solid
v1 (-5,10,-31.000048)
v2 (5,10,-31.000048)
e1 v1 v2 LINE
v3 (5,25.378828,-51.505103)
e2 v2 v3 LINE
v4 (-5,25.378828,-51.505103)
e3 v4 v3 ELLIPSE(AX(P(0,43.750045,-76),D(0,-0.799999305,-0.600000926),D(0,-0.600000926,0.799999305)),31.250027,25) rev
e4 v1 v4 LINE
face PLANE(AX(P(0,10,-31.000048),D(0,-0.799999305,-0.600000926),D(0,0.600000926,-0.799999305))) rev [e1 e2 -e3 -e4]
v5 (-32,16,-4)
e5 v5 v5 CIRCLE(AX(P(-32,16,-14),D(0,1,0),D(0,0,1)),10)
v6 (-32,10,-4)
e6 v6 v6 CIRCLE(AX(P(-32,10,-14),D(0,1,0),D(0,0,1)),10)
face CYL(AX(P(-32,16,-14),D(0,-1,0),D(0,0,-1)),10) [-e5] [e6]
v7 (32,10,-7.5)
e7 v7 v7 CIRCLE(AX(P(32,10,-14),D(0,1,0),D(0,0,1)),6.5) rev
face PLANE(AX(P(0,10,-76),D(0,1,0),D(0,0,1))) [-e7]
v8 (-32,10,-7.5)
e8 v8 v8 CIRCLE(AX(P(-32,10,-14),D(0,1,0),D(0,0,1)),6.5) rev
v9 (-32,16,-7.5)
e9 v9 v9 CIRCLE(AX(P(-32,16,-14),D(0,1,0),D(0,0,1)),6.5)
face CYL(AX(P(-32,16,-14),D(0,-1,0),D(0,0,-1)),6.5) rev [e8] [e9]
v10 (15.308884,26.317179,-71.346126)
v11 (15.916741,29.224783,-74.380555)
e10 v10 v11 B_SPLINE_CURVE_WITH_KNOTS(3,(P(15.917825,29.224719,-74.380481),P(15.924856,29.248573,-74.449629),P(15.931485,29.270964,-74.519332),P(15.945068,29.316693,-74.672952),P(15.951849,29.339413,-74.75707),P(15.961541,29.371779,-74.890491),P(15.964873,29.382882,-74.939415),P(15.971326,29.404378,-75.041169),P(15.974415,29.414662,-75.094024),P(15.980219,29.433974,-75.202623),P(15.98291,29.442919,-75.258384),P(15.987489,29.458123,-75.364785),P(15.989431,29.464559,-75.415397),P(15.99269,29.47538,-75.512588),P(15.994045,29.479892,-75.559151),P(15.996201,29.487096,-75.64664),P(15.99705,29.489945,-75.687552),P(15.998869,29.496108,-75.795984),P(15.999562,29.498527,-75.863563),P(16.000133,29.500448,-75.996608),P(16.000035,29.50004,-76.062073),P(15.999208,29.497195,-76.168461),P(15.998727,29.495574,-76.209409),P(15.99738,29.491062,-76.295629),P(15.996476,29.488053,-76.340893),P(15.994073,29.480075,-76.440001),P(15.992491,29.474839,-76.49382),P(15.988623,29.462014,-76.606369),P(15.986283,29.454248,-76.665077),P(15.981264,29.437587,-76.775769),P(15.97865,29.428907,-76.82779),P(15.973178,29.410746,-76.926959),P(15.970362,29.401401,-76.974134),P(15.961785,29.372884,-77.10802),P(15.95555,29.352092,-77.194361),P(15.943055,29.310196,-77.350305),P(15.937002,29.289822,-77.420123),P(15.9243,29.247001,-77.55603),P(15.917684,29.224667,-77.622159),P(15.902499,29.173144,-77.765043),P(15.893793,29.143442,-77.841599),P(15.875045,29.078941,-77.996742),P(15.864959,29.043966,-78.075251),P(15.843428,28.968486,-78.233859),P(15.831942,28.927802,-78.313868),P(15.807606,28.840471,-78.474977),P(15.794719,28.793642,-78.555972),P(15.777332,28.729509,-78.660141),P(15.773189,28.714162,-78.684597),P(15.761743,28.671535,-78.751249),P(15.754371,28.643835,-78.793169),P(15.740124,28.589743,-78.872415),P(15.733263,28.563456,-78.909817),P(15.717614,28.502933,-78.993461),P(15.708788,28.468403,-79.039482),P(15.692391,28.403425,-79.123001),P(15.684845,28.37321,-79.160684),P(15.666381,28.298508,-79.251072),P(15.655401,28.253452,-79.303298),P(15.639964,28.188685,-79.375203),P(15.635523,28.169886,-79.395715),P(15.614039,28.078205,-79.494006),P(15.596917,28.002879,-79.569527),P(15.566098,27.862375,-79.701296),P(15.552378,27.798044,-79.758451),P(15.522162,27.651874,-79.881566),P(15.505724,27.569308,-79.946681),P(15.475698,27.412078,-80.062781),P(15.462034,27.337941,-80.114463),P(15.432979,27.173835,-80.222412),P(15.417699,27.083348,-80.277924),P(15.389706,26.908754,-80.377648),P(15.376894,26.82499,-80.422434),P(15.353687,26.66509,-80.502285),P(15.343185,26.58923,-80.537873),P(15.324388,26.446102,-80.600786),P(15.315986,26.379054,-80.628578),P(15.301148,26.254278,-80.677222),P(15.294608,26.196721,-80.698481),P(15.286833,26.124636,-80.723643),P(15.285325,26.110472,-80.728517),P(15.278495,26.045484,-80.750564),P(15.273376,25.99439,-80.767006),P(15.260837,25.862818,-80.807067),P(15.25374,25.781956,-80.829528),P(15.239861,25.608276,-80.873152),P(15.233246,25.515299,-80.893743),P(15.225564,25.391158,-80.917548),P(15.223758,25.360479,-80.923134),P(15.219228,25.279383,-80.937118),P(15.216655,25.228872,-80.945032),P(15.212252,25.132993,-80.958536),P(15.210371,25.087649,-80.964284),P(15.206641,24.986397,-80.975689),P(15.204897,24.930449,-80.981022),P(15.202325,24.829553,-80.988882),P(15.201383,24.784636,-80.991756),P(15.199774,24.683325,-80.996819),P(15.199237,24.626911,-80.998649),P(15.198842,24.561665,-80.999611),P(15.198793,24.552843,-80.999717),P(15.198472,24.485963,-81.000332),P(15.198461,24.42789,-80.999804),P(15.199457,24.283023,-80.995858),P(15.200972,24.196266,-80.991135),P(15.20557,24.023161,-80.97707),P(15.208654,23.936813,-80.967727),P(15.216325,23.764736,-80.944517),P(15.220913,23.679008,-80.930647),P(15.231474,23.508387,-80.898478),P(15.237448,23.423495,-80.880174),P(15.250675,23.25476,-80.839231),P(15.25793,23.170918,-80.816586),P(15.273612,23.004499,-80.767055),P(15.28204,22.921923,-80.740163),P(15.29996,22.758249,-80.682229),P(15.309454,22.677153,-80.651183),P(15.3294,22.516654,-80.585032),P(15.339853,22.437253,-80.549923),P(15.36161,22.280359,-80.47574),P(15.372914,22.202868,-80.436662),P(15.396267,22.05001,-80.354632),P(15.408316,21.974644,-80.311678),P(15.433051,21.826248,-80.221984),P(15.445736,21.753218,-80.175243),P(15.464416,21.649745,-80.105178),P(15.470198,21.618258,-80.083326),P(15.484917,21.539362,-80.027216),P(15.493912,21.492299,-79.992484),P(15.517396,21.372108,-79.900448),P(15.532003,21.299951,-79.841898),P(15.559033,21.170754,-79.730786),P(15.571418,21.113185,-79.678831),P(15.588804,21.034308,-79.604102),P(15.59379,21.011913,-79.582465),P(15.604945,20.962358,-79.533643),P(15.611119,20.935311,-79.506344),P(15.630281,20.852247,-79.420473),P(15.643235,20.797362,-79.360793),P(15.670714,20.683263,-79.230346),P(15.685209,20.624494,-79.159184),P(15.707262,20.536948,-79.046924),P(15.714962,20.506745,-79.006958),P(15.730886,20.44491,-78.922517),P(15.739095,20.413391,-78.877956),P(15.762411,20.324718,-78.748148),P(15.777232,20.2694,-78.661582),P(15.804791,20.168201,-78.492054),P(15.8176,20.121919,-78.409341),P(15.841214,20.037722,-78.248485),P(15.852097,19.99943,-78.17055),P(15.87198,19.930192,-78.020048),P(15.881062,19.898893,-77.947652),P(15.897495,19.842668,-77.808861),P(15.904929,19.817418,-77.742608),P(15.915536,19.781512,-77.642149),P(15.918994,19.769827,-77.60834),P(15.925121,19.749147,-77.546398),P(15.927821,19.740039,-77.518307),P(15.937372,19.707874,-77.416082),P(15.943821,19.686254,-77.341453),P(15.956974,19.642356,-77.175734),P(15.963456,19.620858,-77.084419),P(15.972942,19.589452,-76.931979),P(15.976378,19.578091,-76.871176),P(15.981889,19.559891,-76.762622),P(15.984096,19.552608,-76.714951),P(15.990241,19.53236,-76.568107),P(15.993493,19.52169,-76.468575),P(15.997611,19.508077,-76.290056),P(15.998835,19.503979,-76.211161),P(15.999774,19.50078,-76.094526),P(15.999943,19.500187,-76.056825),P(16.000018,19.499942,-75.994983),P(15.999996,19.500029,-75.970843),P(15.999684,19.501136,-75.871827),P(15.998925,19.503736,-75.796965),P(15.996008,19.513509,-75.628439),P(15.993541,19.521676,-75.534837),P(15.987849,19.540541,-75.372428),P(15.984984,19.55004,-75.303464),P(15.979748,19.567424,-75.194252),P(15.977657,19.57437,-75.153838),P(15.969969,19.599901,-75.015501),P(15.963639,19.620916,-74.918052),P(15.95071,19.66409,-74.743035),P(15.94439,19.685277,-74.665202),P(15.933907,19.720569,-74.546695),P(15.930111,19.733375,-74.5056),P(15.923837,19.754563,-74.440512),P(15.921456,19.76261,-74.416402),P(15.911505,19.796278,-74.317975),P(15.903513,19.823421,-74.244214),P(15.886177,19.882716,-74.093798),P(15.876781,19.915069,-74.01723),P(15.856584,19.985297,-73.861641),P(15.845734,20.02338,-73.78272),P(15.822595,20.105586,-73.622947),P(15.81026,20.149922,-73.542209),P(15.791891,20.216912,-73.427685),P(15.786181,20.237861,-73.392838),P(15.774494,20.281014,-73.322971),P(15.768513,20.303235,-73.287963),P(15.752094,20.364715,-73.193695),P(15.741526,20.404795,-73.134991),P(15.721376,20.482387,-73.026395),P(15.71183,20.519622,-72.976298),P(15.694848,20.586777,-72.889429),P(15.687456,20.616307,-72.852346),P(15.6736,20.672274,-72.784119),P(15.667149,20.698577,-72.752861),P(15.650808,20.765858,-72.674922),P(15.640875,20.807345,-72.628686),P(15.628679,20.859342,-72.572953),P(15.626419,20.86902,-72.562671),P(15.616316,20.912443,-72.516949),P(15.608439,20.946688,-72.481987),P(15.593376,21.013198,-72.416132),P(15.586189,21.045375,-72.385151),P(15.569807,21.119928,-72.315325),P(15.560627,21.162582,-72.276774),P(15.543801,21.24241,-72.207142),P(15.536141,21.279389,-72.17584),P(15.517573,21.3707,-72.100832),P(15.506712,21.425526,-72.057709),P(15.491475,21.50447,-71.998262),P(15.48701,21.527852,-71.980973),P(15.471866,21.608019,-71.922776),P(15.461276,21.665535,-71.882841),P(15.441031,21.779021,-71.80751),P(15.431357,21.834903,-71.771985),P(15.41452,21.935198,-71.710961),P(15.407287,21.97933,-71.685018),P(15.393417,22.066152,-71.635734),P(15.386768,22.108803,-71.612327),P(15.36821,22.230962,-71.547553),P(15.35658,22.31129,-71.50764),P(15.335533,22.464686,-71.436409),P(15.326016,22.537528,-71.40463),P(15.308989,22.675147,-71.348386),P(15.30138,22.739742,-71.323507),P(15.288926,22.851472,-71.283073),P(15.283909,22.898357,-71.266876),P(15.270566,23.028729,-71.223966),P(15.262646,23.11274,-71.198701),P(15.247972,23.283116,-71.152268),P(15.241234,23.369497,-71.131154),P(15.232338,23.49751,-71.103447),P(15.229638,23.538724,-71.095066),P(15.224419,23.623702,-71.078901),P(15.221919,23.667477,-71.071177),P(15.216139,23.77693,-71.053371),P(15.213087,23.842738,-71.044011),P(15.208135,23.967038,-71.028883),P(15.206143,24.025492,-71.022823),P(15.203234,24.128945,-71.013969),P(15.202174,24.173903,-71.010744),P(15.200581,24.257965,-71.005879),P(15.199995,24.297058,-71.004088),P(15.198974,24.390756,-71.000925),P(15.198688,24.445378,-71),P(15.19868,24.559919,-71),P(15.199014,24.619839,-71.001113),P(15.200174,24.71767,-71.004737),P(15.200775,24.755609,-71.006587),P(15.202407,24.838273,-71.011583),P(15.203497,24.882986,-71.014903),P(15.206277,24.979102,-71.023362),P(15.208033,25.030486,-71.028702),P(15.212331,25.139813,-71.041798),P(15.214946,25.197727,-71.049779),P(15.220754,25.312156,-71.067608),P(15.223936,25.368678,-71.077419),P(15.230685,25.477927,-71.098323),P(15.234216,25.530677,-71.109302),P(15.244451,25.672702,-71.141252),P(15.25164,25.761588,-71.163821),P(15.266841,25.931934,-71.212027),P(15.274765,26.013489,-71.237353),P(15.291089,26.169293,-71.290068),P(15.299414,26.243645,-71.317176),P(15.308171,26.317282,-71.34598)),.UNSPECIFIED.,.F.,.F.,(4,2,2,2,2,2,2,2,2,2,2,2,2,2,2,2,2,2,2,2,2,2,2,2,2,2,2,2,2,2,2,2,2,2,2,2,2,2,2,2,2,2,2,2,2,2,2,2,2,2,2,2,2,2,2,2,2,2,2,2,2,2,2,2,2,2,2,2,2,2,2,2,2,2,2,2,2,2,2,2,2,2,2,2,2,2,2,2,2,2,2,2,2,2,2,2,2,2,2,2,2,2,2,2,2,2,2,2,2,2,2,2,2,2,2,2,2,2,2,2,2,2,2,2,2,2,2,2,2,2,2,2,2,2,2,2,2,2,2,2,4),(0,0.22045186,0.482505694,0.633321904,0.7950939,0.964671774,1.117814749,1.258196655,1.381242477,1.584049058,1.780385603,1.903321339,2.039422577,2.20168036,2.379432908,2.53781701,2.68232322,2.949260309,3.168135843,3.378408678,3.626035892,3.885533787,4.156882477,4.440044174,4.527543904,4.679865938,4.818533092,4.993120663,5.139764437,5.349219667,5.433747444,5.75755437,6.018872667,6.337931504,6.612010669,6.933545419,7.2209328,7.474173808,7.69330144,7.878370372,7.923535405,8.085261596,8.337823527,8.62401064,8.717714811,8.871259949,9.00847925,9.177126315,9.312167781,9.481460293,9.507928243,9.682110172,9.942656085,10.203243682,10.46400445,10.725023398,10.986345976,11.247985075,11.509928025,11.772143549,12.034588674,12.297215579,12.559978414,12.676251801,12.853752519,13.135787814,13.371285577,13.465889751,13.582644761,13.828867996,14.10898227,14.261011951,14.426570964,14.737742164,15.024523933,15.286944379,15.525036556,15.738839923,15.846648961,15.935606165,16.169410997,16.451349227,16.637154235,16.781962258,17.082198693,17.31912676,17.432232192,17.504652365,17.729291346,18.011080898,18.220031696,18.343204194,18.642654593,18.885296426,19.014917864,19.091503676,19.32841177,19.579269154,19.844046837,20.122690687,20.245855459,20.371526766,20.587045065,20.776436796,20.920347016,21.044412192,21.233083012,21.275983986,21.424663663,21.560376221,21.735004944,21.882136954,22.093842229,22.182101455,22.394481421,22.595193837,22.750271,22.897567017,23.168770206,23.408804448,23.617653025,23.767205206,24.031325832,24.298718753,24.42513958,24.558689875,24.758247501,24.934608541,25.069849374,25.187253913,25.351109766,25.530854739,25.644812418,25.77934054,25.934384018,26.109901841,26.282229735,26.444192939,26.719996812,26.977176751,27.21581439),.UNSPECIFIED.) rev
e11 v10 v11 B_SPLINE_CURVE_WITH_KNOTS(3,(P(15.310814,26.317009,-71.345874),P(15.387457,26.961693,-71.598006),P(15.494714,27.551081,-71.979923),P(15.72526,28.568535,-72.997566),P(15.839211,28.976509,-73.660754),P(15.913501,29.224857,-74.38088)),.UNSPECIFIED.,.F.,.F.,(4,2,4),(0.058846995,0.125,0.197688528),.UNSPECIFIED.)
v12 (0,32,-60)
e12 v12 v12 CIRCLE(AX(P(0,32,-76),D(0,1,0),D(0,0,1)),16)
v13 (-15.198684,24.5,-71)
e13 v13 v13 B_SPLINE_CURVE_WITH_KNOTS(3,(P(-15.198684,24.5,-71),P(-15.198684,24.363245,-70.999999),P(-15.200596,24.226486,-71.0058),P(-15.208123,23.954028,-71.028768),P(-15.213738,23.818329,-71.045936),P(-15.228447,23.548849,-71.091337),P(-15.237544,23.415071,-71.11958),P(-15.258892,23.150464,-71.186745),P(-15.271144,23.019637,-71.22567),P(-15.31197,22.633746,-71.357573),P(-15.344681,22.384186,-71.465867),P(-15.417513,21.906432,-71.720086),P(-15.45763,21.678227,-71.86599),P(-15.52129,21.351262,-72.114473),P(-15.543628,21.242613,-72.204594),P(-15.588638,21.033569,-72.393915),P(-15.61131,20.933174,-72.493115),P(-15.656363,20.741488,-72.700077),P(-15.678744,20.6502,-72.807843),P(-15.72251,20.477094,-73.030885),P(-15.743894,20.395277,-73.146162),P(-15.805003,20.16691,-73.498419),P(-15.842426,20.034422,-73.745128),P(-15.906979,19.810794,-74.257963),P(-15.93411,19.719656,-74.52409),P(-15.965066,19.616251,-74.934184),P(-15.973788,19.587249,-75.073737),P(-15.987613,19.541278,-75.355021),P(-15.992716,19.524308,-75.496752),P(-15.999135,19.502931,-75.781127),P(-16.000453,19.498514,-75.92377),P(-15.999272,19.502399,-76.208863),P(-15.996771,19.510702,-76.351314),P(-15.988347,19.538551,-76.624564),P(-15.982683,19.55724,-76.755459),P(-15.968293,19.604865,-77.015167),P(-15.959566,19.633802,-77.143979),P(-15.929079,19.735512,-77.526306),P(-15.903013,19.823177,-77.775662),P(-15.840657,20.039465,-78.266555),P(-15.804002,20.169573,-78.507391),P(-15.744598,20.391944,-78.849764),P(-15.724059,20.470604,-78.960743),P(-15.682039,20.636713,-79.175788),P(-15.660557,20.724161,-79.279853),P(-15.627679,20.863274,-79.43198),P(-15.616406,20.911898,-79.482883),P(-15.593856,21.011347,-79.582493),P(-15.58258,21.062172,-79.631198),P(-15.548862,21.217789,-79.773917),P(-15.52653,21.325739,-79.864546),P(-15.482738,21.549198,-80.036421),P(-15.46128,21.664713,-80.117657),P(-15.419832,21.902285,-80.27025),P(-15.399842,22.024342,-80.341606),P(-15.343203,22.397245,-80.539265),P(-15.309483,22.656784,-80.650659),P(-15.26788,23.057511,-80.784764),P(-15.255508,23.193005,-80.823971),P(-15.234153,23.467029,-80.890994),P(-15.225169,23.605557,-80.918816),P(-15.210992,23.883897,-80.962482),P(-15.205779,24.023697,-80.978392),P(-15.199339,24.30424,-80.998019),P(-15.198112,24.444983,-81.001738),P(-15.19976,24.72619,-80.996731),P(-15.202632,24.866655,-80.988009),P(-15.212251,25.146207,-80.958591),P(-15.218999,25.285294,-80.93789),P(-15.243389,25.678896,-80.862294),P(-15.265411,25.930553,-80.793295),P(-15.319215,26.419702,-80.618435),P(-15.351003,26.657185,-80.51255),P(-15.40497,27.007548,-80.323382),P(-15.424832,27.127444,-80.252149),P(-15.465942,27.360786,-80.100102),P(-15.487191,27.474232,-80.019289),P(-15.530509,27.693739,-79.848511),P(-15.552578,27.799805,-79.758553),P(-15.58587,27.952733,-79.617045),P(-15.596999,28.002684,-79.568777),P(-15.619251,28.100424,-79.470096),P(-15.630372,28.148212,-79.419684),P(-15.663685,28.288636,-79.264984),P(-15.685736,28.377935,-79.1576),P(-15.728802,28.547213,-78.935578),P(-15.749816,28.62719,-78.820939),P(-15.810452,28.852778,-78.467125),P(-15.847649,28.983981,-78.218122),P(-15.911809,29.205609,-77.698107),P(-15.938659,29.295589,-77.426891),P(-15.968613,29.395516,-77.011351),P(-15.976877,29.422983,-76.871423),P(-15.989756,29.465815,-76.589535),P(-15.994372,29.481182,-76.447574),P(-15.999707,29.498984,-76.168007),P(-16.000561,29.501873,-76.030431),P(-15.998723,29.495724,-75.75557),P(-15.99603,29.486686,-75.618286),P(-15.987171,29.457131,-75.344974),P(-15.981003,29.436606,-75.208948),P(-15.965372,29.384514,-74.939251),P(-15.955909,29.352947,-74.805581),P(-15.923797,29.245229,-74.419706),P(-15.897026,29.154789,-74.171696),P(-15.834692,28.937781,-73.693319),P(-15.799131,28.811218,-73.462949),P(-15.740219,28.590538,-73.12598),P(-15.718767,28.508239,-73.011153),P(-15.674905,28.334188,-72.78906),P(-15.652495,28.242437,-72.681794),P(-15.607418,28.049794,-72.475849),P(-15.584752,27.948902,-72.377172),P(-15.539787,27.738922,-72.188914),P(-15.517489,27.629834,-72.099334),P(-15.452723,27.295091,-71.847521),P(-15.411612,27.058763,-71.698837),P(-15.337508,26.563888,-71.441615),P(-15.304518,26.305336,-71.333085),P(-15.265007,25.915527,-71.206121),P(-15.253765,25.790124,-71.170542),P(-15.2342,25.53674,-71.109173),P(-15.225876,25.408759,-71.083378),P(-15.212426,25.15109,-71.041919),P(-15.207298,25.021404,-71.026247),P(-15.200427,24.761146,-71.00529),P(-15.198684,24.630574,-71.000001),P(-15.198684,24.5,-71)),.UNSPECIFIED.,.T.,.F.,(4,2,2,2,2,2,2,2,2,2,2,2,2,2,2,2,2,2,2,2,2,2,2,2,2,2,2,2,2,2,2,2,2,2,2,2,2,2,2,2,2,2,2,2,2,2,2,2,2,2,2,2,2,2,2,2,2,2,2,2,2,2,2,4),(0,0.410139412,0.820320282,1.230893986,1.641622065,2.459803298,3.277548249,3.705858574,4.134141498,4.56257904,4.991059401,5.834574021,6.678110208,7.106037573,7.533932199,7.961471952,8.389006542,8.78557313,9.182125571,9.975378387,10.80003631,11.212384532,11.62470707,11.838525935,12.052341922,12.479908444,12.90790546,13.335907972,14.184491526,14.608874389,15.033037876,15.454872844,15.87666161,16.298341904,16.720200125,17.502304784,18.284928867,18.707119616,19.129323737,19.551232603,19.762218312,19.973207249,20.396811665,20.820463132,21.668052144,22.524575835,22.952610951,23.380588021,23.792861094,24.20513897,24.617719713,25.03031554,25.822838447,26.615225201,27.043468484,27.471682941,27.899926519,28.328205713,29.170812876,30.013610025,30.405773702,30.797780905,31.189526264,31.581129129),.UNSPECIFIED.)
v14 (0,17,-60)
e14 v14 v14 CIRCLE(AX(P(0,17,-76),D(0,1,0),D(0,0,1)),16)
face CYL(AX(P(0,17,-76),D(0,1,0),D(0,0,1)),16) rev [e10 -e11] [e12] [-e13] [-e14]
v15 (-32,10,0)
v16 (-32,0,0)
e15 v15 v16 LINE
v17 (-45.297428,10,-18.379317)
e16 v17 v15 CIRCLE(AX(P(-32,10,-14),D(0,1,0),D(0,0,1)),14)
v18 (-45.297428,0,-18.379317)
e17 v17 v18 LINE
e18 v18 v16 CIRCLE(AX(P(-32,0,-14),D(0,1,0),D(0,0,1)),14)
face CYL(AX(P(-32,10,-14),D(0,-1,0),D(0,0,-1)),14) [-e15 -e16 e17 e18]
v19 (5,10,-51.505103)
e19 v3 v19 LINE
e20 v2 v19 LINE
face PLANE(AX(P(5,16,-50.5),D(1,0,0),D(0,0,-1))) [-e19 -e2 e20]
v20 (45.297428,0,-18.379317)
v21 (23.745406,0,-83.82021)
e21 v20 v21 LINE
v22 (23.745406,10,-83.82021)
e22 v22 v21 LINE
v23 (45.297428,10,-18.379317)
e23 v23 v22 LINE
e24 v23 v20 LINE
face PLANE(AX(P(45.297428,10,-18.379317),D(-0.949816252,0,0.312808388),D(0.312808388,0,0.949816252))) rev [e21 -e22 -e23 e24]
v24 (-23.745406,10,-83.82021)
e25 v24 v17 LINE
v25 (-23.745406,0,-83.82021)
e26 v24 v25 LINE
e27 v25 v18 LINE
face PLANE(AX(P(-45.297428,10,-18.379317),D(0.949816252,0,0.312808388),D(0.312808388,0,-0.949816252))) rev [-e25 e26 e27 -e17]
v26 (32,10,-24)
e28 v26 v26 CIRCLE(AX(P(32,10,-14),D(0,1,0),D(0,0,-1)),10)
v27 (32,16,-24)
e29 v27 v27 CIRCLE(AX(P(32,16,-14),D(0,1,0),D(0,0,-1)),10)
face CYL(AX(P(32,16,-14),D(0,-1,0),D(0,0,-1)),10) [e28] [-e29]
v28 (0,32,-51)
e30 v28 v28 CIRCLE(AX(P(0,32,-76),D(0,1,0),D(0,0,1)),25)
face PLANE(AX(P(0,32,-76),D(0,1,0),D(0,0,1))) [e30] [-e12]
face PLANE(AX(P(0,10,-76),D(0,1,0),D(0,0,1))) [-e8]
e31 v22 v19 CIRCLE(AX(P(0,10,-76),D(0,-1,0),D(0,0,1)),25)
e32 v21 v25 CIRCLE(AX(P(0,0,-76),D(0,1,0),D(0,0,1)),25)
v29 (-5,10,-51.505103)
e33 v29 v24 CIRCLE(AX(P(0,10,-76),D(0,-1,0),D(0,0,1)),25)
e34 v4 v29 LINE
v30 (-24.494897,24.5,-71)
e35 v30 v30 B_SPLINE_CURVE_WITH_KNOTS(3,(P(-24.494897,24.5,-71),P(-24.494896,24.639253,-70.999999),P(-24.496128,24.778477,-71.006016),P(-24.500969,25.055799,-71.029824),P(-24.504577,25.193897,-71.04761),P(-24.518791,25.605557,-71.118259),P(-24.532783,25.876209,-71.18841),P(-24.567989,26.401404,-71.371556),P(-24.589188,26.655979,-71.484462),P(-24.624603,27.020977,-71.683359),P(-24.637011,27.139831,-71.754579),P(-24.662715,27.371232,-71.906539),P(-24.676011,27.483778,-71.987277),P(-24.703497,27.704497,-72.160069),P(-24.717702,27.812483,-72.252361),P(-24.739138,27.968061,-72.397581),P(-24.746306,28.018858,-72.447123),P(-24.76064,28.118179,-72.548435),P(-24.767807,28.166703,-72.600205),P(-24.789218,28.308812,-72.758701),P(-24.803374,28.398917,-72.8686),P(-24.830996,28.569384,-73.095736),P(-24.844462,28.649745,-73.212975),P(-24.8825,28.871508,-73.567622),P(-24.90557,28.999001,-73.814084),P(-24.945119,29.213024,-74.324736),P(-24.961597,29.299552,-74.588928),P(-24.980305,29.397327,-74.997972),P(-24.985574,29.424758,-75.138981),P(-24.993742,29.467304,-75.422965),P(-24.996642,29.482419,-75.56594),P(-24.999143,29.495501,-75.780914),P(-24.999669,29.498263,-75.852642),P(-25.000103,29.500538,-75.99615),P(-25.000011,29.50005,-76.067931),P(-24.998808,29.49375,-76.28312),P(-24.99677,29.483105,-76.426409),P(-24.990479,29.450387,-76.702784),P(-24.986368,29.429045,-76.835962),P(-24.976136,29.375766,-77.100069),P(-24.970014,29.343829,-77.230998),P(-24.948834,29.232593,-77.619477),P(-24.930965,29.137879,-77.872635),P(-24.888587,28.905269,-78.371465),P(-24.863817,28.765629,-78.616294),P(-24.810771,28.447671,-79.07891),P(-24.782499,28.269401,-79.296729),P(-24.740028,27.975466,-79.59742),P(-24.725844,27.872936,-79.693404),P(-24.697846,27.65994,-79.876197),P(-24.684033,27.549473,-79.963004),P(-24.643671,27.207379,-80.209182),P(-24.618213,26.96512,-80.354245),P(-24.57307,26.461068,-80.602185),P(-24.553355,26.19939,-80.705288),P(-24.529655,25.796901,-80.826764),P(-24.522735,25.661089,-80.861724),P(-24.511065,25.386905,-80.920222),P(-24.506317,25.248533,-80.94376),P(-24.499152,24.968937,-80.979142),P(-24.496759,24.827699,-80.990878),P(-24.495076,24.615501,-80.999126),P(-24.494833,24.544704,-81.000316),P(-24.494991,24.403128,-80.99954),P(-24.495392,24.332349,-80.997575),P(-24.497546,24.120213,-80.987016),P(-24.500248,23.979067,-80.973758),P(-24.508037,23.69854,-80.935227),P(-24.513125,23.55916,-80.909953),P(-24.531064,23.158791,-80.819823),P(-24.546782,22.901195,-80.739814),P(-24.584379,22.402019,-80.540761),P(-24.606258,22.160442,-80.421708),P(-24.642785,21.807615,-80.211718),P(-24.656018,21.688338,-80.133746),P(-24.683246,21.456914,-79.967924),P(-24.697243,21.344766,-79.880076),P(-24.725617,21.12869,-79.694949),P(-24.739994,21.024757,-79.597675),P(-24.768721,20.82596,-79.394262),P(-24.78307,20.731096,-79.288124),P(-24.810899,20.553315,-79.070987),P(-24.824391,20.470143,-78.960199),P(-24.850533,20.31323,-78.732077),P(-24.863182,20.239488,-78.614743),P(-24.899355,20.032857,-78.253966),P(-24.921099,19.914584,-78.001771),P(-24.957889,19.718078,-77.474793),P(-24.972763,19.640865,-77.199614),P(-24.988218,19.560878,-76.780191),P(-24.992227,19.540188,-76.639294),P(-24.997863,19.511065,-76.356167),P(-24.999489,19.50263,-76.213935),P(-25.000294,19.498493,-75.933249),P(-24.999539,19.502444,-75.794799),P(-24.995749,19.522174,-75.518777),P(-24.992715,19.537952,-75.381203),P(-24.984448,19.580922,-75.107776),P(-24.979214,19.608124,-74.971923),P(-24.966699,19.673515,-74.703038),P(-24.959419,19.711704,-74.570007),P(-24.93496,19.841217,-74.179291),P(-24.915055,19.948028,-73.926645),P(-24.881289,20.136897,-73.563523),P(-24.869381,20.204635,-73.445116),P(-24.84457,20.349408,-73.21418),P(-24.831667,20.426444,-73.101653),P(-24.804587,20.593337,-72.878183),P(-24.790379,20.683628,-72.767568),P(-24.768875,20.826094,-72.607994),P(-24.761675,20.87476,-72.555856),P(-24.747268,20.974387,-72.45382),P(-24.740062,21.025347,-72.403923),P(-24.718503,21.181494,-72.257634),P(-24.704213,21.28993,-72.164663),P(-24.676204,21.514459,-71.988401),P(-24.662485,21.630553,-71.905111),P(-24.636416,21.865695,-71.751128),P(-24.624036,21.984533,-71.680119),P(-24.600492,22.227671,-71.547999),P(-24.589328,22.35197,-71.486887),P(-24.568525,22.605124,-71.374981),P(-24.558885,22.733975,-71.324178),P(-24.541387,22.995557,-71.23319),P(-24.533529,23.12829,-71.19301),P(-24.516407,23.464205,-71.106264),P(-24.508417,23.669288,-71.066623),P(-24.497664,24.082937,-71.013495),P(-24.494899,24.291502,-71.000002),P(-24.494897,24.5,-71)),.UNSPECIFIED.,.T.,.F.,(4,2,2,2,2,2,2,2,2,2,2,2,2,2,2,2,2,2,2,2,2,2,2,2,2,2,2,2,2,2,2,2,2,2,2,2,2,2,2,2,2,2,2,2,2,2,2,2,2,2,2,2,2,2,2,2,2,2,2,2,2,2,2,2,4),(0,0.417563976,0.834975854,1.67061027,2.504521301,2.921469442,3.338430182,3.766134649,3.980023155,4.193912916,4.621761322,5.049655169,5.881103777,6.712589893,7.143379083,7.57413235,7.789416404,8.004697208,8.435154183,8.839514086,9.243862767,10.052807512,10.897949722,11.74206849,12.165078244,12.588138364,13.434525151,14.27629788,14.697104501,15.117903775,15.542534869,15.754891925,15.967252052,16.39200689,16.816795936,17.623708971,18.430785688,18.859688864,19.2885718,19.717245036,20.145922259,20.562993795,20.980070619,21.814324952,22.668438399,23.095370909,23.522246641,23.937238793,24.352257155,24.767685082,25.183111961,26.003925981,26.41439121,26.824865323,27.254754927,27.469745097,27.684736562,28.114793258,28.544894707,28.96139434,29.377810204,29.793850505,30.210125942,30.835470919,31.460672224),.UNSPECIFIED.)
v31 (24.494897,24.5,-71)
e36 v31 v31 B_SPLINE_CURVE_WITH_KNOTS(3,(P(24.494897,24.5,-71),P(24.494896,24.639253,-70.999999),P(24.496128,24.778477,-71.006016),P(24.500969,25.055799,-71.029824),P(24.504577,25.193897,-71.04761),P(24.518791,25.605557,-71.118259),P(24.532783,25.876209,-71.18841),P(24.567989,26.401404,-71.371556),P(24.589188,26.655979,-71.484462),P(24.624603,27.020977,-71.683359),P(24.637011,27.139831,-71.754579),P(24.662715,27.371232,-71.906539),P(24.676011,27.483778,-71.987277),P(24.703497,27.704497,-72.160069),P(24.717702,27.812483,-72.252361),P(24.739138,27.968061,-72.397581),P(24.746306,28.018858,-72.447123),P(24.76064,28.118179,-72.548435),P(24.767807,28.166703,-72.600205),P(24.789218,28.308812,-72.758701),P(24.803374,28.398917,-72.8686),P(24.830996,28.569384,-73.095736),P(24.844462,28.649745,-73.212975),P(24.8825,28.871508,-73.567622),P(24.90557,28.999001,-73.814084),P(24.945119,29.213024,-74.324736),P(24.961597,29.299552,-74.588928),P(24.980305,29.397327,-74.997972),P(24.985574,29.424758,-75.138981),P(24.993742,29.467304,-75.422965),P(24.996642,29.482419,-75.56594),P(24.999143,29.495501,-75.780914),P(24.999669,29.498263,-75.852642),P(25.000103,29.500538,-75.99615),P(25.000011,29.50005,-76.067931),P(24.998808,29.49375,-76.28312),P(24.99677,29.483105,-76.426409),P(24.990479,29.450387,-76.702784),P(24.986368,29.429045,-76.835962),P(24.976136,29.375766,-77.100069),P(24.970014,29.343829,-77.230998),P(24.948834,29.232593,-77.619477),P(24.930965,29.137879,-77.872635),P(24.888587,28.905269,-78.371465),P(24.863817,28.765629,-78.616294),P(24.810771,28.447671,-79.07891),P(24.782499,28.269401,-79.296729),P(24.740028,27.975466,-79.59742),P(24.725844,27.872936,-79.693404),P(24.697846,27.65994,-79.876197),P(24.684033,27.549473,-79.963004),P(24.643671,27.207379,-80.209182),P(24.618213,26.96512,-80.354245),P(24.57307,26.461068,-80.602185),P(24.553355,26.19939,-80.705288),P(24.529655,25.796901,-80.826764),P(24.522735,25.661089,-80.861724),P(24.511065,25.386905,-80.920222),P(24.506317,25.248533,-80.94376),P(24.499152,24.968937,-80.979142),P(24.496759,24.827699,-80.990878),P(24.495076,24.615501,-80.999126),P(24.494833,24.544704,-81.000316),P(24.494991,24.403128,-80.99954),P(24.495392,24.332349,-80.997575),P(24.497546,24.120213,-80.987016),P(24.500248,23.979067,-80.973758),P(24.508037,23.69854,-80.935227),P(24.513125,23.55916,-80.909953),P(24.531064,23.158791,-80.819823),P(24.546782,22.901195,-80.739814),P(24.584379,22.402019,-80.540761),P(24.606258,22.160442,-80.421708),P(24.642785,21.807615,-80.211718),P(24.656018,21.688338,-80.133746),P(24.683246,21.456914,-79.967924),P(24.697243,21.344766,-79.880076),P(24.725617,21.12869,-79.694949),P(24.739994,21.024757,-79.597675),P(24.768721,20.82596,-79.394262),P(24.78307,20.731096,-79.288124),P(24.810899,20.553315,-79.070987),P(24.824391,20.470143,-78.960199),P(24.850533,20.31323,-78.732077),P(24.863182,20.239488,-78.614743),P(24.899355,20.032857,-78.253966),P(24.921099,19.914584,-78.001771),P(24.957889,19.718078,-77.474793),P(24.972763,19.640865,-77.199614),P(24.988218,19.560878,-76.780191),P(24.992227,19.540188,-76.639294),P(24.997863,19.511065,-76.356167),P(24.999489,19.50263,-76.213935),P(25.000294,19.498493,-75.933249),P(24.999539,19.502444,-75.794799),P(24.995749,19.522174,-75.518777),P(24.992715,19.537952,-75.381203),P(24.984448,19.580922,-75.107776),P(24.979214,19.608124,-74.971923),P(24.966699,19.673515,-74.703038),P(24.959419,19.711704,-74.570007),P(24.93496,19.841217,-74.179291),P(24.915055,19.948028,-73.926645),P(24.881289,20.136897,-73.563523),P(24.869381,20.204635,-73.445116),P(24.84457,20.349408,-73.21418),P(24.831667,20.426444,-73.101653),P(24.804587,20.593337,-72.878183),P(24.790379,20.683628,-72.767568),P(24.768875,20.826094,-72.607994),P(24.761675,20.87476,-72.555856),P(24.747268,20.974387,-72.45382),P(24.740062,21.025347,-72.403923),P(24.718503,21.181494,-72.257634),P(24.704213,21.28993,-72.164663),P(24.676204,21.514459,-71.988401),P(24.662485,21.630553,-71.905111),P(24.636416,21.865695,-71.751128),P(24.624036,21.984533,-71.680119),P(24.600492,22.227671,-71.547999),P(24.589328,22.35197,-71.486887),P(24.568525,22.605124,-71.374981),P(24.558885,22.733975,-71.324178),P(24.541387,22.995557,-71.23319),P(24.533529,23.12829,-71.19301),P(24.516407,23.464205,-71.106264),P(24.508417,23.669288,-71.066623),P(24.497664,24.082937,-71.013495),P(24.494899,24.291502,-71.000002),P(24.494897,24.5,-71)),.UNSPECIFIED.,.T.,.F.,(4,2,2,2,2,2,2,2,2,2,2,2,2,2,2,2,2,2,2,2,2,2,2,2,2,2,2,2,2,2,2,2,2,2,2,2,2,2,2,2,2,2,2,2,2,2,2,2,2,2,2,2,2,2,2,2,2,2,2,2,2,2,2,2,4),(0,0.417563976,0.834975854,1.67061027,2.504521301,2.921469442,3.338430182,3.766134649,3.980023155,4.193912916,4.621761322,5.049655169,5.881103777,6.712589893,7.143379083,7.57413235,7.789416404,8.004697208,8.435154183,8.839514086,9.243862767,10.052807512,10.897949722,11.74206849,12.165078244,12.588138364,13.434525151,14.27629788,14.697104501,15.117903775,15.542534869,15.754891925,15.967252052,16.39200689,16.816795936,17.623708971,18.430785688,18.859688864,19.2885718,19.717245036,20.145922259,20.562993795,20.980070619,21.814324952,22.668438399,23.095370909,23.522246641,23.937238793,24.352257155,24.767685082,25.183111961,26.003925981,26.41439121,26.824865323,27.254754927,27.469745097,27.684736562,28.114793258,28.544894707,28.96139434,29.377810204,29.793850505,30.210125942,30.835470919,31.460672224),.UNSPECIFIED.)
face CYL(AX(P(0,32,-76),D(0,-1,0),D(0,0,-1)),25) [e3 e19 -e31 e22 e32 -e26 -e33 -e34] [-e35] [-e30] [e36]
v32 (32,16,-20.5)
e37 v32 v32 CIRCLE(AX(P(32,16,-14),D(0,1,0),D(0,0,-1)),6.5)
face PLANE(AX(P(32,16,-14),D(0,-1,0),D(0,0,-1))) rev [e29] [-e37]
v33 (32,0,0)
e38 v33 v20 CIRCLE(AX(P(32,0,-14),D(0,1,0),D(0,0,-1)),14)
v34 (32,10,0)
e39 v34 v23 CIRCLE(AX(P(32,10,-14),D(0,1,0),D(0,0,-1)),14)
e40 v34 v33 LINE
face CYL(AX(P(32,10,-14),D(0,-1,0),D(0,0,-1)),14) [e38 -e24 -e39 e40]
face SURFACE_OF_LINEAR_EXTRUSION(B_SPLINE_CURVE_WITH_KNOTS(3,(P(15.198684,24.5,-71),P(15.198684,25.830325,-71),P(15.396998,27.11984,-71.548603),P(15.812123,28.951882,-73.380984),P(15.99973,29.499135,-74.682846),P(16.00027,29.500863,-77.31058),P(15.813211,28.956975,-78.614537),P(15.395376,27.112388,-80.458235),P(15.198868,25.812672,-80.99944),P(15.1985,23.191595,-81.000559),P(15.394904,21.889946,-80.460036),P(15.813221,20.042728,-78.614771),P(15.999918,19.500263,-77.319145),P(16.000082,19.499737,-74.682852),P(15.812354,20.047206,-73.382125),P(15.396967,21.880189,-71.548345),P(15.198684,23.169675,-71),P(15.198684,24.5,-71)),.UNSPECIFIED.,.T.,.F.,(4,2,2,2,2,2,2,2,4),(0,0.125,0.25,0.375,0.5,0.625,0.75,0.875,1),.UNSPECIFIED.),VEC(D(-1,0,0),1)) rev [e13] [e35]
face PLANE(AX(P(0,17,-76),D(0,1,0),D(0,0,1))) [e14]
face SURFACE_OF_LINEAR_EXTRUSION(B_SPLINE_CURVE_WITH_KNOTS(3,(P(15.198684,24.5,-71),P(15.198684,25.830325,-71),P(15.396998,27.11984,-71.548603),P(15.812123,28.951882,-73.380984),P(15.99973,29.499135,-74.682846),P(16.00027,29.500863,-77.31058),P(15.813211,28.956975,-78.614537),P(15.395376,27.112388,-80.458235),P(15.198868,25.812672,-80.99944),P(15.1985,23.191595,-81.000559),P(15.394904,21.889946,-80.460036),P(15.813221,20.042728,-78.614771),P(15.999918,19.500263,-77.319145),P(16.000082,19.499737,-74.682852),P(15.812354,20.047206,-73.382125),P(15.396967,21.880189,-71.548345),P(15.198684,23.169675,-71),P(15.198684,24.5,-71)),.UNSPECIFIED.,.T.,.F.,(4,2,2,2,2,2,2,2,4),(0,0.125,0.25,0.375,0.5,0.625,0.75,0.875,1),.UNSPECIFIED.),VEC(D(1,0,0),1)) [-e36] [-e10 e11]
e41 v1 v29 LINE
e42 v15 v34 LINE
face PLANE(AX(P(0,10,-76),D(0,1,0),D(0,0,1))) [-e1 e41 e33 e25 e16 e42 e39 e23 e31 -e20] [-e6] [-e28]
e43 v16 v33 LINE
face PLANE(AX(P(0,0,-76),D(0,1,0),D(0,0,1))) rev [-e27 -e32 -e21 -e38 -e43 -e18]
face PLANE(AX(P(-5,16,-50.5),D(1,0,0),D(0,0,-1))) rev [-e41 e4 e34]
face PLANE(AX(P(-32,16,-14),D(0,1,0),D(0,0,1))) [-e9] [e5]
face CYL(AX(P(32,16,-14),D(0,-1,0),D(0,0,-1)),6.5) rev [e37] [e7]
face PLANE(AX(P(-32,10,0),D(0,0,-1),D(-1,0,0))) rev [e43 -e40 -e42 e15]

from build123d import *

# Parameters (mm, degrees)
SALIENTE_EXTRUIR1_DEPTH = 10
CROQUIS2_R              = 25
SALIENTE_EXTRUIR3_DEPTH = 32
CROQUIS4_R              = 16
CORTAR_EXTRUIR1_DEPTH   = 15
CORTAR_EXTRUIR2_START   = -25.000000112
CORTAR_EXTRUIR2_DEPTH   = 50.000000224
NERVIO1_REACH           = 117.503
CROQUIS8_WALL_W         = 258.006455054
CROQUIS8_WALL_H         = 10
CROQUIS9_R              = 10
CROQUIS9_R_2            = 6.5
SALIENTE_EXTRUIR4_DEPTH = 6


# Read off the part's stored shape, not the designer's step: Cortar-Extruir2
with BuildPart() as part:
    # Croquis1 → Saliente-Extruir1 (new body)
    with BuildSketch(Plane(origin=(0, 0, 0), x_dir=(1, 0, 0), z_dir=(0, 1, 0))):
        with BuildLine():
            Line((-45.297427526, 18.379317433), (-23.745406297, 83.820209702))
            ThreePointArc((-23.745406297, 83.820209702), (0, 51), (23.745406297, 83.820209702))
            Line((23.745406297, 83.820209702), (45.297427526, 18.379317433))
            ThreePointArc((45.297427526, 18.379317433), (43.342628533, 5.793613586), (32, 0))
            Line((32, 0), (-32, 0))
            ThreePointArc((-32, 0), (-43.342628533, 5.793613586), (-45.297427526, 18.379317433))
        make_face()
    extrude(amount=SALIENTE_EXTRUIR1_DEPTH)

    # Croquis2 → Saliente-Extruir3 (add)
    with BuildSketch(Plane(origin=(0, 0, 0), x_dir=(1, 0, 0), z_dir=(0, 1, 0))):
        with Locations(Location((0, 76, 0), (0, 0, 161.771441232))):
            Circle(CROQUIS2_R)
    extrude(amount=SALIENTE_EXTRUIR3_DEPTH)

    # Croquis4 → Cortar-Extruir1 (cut)
    with BuildSketch(Plane(origin=(0, 32, 0), x_dir=(1, 0, 0), z_dir=(0, 1, 0))):
        with Locations(Location((0, 76, 0), (0, 0, 270))):
            Circle(CROQUIS4_R)
    extrude(amount=-CORTAR_EXTRUIR1_DEPTH, mode=Mode.SUBTRACT)

    # Cortar-Extruir2 outline → Cortar-Extruir2 (cut)
    with BuildSketch(Plane(origin=(0, 0, 0), x_dir=(0, 0, -1), z_dir=(1, 0, 0)).offset(CORTAR_EXTRUIR2_START)):
        with BuildLine():
            add(Edge.make_bspline(
                [(71, 24.5), (71, 25.830324865), (71.548602551, 27.119839879), (73.380983998, 28.951882233), (74.682846227, 29.499135225), (77.310580087, 29.500862615), (78.614537315, 28.956974901), (80.458235075, 27.112387922), (80.999440282, 25.812671971), (81.000558807, 23.191595456), (80.460035839, 21.889945603), (78.61477129, 20.042727881), (77.319144976, 19.500263352), (74.682852162, 19.499736848), (73.382124852, 20.047206111), (71.548344872, 21.880188876), (71, 23.169675135), (71, 24.5)],
                knots=[0, 0, 0, 0, 0.125, 0.125, 0.25, 0.25, 0.375, 0.375, 0.5, 0.5, 0.625, 0.625, 0.75, 0.75, 0.875, 0.875, 1, 1, 1, 1], degree=3))
        make_face()
    extrude(amount=CORTAR_EXTRUIR2_DEPTH, mode=Mode.SUBTRACT)

    # Croquis8 wall → Nervio1 (add, up to next)
    with BuildSketch(Plane(origin=(0, 17.5, -41.00002412), x_dir=(0, 0.600000926209, -0.799999305342), z_dir=(0, 0.799999305342, 0.600000926209)), mode=Mode.PRIVATE) as nervio1_sk1:
        Rectangle(CROQUIS8_WALL_W, CROQUIS8_WALL_H)
    nervio1_tool1 = extrude(nervio1_sk1.sketch, amount=-NERVIO1_REACH, mode=Mode.PRIVATE) - part.part
    add(nervio1_tool1.solids().sort_by_distance((0, 17.5, -41.00002412))[0])

    # Croquis9 → Saliente-Extruir4 (add)
    # profile 1 of 2: a face of its own
    with BuildSketch(Plane(origin=(0, 10, 0), x_dir=(1, 0, 0), z_dir=(0, 1, 0))):
        with Locations(Location((-32, 14, 0), (0, 0, 270))):
            Circle(CROQUIS9_R)
        with Locations(Location((-32, 14, 0), (0, 0, 270))):
            Circle(CROQUIS9_R_2, mode=Mode.SUBTRACT)
    # profile 2 of 2: a face of its own
    with BuildSketch(Plane(origin=(0, 10, 0), x_dir=(1, 0, 0), z_dir=(0, 1, 0))):
        with Locations(Location((32, 14, 0), (0, 0, 90))):
            Circle(CROQUIS9_R)
        with Locations(Location((32, 14, 0), (0, 0, 90))):
            Circle(CROQUIS9_R_2, mode=Mode.SUBTRACT)
    extrude(amount=SALIENTE_EXTRUIR4_DEPTH)


solid = part.part
